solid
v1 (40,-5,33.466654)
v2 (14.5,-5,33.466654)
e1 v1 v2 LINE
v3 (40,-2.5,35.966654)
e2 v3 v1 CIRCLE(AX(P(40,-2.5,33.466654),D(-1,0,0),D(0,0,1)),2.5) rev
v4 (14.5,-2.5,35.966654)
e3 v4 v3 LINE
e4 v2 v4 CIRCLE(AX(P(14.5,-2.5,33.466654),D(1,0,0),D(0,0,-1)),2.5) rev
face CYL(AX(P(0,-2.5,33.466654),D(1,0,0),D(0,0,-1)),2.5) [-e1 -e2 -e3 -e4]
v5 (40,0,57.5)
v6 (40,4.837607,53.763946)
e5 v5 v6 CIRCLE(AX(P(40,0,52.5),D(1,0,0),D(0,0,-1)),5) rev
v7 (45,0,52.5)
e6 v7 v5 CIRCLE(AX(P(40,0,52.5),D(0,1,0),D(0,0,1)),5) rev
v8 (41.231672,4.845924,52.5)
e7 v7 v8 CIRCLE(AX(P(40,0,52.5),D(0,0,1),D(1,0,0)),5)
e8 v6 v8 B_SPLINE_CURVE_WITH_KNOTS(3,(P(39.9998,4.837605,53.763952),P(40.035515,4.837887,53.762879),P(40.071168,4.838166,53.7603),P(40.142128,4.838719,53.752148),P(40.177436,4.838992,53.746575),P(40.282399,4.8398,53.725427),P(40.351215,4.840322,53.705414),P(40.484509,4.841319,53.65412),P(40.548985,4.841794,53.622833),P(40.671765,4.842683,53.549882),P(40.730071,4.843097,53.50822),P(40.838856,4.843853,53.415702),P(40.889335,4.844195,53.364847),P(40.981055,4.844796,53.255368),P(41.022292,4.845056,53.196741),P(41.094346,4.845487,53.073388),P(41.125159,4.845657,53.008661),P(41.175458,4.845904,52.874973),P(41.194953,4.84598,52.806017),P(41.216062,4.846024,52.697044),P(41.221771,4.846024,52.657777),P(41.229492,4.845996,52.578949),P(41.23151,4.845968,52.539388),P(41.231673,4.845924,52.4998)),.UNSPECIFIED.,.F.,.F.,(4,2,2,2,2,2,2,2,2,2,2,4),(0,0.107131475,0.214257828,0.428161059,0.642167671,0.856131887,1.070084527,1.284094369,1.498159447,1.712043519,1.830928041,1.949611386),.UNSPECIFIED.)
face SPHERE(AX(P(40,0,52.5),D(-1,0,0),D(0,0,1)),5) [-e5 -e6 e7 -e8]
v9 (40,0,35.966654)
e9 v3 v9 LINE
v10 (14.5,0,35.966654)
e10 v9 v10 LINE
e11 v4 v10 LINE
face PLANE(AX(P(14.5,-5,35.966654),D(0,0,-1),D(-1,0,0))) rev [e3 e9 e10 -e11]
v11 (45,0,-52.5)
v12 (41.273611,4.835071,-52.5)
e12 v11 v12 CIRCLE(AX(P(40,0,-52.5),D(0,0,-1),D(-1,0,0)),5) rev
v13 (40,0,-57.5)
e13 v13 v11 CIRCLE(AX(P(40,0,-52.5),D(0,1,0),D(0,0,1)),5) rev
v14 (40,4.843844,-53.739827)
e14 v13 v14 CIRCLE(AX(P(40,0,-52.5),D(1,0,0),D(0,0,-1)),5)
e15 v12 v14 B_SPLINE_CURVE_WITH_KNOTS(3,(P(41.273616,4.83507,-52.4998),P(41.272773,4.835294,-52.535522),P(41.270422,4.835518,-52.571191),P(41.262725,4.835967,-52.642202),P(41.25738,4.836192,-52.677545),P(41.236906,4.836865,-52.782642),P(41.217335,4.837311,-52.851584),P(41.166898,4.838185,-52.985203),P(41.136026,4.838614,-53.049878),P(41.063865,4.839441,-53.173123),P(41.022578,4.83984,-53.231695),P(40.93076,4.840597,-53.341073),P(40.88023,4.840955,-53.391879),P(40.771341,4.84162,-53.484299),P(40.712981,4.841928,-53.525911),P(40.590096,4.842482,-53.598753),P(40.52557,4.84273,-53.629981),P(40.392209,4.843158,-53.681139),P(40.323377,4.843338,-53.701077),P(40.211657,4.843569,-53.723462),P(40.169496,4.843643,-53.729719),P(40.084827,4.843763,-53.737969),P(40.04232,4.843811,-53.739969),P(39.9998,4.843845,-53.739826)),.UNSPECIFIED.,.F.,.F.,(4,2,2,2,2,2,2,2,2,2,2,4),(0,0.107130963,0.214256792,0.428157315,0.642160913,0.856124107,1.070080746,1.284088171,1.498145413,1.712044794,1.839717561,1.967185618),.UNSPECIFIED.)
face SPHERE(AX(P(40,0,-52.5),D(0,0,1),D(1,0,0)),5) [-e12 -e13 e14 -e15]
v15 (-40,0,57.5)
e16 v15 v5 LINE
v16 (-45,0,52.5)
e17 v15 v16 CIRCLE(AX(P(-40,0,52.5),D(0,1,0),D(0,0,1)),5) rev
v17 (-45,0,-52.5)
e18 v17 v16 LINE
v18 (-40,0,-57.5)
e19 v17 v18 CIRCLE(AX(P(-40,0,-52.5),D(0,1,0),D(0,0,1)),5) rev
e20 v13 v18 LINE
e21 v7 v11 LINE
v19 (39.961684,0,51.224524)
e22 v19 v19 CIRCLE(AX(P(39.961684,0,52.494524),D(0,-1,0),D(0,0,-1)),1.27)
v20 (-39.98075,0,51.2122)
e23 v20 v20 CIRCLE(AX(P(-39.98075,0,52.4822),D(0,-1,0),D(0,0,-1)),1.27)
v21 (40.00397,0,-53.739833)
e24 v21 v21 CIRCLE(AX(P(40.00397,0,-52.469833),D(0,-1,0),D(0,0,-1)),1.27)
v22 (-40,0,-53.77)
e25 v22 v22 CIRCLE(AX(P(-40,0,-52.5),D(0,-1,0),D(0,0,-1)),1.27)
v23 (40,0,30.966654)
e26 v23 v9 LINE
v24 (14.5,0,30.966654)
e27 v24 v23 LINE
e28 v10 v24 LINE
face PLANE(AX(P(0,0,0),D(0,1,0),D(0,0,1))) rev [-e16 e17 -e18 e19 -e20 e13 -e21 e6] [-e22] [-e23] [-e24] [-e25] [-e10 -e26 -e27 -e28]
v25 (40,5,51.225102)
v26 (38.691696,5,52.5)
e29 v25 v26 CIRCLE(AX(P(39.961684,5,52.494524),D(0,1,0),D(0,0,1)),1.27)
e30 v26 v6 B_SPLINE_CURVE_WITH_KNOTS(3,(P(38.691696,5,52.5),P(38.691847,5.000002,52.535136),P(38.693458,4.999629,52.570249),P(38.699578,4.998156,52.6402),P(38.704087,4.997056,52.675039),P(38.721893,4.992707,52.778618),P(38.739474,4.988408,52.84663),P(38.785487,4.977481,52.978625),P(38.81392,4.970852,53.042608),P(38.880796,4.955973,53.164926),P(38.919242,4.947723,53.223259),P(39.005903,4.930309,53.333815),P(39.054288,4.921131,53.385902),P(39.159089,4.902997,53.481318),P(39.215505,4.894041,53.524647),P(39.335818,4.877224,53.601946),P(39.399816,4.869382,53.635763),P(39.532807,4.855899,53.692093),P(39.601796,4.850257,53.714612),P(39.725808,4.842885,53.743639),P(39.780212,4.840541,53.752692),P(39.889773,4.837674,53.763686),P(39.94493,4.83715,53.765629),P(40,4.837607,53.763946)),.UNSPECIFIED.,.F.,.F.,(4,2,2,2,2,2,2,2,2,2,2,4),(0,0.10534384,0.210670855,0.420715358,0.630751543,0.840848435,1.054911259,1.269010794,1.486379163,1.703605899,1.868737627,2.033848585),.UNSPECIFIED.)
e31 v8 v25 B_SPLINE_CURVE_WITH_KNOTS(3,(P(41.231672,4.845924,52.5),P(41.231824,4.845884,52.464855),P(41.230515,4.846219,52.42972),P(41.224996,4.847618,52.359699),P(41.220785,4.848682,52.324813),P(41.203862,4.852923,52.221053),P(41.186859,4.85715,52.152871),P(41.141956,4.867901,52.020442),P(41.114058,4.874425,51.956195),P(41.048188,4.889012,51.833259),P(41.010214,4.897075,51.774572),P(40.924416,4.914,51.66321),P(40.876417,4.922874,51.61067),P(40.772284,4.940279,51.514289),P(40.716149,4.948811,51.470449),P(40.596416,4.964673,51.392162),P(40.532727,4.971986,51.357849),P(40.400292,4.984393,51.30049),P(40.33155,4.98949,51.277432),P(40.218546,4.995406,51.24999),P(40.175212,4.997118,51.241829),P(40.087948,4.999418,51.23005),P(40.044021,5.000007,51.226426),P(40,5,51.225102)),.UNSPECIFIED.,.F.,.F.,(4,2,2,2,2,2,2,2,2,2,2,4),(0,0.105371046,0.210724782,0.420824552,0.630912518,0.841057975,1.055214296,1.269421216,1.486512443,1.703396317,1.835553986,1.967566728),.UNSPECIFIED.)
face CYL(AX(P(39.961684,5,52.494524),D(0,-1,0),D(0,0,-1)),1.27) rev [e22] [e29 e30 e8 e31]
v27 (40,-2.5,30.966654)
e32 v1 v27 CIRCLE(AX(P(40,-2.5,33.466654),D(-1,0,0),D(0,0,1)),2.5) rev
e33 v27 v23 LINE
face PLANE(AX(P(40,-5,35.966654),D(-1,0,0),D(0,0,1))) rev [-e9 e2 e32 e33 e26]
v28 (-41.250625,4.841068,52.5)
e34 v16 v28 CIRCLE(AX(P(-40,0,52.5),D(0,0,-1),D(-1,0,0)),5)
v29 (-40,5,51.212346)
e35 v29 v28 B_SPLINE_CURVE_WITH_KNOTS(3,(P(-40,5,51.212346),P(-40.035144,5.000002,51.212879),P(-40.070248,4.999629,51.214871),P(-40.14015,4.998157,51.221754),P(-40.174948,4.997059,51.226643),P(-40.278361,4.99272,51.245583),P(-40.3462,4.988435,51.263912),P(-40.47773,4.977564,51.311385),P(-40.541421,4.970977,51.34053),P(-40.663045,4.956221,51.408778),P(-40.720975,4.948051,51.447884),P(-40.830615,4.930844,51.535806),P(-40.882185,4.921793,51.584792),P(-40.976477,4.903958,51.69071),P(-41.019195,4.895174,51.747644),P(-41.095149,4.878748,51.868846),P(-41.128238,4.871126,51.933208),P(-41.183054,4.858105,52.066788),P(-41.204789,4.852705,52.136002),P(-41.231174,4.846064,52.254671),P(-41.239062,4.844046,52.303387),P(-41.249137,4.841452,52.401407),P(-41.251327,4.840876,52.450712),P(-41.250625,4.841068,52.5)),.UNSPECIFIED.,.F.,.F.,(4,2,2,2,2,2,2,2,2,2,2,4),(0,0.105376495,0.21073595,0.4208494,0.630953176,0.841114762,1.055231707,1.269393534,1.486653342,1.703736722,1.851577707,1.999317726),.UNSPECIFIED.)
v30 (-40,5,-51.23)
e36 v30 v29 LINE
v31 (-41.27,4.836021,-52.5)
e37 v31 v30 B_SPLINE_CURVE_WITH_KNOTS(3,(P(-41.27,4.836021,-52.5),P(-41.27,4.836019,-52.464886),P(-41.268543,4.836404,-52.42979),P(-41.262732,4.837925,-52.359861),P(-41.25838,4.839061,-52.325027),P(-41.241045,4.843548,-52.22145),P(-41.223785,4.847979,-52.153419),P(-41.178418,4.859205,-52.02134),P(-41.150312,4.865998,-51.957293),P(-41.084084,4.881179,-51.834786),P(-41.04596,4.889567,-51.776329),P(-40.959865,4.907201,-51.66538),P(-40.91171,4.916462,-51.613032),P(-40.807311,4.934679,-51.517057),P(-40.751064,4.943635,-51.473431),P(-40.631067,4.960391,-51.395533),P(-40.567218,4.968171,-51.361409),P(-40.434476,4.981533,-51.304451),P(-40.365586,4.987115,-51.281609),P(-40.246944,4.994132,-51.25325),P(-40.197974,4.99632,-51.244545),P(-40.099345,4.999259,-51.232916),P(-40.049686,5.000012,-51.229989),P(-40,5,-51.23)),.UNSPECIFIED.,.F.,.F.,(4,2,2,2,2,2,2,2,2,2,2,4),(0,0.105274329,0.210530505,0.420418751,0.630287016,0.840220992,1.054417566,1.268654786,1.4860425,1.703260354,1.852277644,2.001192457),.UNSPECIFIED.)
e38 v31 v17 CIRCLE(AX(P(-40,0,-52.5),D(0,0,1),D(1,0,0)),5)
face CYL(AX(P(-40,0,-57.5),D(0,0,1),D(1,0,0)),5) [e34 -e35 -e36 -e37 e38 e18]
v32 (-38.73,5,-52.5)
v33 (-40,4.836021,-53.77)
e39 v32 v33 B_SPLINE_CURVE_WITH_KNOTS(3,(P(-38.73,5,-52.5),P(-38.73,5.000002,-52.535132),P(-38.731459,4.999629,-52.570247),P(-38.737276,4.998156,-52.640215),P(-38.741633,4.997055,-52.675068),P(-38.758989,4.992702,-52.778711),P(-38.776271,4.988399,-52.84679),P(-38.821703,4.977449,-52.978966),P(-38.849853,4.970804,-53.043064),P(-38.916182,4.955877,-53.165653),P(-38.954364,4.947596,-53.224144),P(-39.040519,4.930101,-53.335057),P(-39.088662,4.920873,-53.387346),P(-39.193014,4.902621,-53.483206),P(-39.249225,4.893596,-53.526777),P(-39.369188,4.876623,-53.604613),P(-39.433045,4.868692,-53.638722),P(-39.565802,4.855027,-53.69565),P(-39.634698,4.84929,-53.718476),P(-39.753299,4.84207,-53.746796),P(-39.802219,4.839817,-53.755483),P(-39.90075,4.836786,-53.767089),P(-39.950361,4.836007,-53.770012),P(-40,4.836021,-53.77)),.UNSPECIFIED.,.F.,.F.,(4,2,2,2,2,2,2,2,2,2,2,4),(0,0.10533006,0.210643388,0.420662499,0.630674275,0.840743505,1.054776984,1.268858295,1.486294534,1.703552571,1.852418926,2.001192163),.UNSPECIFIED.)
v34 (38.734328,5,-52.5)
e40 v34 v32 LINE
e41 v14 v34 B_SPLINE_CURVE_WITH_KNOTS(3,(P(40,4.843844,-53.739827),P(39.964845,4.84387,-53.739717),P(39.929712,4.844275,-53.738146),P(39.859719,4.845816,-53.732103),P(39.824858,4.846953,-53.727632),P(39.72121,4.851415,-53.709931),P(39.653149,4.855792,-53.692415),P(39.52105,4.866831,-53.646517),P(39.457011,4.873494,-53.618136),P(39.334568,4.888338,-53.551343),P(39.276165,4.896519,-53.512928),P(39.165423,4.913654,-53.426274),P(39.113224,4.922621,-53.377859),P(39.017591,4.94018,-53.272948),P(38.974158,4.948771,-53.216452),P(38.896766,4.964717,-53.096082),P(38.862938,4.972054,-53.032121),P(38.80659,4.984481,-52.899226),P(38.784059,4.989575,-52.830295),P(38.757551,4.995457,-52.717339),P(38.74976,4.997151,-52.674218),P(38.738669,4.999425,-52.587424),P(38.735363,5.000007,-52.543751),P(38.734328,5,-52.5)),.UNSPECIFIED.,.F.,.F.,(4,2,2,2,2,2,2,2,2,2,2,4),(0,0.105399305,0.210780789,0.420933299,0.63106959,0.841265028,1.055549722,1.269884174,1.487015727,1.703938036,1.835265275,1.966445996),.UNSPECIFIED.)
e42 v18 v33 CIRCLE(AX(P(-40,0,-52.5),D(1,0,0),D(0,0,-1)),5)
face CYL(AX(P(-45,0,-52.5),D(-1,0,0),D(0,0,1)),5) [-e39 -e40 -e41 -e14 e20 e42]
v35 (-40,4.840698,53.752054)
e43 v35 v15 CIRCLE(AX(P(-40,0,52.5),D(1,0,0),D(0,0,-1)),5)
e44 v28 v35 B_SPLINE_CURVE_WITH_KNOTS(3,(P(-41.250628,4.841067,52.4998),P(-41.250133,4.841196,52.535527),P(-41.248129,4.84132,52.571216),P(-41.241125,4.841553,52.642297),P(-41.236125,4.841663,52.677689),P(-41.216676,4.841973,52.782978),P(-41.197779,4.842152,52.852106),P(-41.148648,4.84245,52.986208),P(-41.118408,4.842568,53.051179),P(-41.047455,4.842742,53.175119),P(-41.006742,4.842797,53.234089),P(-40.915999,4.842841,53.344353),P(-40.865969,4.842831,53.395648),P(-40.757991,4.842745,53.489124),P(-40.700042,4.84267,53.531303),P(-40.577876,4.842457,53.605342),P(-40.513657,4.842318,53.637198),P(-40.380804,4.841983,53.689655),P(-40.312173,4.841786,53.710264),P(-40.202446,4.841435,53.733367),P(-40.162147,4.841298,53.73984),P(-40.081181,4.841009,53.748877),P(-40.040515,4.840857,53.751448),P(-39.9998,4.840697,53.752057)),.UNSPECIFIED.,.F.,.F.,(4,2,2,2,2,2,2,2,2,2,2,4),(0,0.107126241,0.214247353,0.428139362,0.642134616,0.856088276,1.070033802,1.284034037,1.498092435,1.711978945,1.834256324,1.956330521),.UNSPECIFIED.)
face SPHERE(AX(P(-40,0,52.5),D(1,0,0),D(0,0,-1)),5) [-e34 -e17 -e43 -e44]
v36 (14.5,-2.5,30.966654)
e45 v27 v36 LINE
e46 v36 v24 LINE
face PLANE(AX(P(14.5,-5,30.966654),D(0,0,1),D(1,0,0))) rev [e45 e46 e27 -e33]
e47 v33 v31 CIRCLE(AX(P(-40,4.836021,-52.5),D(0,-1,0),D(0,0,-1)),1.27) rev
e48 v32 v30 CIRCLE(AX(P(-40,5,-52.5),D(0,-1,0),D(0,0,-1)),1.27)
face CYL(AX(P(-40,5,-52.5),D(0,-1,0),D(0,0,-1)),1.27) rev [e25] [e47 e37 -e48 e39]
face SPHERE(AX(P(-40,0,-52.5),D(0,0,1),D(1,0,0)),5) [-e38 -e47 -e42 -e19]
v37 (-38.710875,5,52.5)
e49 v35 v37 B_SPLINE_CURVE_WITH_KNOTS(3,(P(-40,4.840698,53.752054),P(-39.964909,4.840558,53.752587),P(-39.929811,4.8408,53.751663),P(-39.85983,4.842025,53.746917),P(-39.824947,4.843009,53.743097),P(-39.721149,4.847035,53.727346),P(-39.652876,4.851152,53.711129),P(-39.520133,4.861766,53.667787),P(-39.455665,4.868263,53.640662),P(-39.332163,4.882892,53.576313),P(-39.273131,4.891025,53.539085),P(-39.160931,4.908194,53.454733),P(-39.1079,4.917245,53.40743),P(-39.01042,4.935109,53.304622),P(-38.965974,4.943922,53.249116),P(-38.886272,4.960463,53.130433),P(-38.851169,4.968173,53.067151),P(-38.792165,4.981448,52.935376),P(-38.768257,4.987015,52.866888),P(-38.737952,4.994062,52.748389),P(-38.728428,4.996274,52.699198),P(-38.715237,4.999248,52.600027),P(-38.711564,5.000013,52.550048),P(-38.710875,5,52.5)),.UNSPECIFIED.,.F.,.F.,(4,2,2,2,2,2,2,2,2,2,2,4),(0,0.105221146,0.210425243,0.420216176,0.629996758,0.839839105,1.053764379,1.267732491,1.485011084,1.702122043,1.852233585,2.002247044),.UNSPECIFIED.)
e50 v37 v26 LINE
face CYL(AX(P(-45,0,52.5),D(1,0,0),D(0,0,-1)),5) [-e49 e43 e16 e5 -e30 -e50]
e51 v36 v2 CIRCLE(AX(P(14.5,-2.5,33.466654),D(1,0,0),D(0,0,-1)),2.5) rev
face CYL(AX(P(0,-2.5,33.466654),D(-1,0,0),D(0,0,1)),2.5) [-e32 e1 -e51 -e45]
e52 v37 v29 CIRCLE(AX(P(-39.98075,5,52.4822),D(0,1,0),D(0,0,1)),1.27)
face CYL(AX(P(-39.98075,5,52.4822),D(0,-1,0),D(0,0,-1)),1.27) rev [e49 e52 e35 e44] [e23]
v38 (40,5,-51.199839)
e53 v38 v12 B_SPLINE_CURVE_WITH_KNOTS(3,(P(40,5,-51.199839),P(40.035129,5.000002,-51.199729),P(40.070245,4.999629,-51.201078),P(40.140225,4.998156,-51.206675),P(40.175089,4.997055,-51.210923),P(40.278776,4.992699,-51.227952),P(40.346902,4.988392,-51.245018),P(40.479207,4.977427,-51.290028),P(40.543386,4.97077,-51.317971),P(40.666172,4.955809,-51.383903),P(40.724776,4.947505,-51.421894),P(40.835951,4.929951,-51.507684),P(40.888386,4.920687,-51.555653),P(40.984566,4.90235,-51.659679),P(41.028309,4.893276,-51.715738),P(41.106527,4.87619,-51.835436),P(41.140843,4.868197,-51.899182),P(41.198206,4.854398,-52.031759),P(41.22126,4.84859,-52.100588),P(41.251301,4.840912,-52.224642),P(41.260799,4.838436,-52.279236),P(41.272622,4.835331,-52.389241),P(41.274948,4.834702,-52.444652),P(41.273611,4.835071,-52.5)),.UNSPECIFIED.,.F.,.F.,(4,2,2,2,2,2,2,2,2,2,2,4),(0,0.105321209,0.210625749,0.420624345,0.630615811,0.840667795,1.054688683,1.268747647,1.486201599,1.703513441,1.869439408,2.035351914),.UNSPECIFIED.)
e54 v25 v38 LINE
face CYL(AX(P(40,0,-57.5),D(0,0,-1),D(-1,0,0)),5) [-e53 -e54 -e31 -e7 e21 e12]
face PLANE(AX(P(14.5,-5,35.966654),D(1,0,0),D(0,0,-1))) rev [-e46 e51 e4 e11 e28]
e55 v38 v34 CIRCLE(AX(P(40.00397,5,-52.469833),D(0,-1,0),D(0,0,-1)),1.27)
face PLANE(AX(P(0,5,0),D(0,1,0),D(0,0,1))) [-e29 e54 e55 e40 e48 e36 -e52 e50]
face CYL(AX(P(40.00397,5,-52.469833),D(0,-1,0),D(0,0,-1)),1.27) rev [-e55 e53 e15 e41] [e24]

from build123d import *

# Parameters (mm, degrees)
SKETCH1_W           = 90
SKETCH1_H           = 115
BOSS_EXTRUDE1_DEPTH = 5
FILLET4_R           = 5
FILLET5_R           = 5
FILLET6_R           = 5
FILLET7_R           = 5
SKETCH4_W           = 25.5
SKETCH4_H           = 5
BOSS_EXTRUDE2_DEPTH = 5
FILLET12_R          = 2.5
FILLET13_R          = 2.5
SKETCH7_R           = 1.27
CUT_EXTRUDE2_DEPTH  = 74.186405842


with BuildPart() as part:
    # Sketch1 → Boss-Extrude1 (new body)
    with BuildSketch(Plane(origin=(0, 0, 0), x_dir=(1, 0, 0), z_dir=(0, 1, 0))):
        Rectangle(SKETCH1_W, SKETCH1_H)
    extrude(amount=BOSS_EXTRUDE1_DEPTH)

    # Fillet4
    fillet4_edges = [part.edges().sort_by_distance(p)[0] for p in [
        (0, 5, 57.5),
    ]]
    fillet(fillet4_edges, radius=FILLET4_R - 0.0001)  # a hair under: the kernel refuses the full size

    # Fillet5
    fillet5_edges = [part.edges().sort_by_distance(p)[0] for p in [
        (-45, 5, -2.49995),
        (-45, 3.535563195, 56.035563195),
    ]]
    fillet(fillet5_edges, radius=FILLET5_R - 0.0001)  # a hair under: the kernel refuses the full size

    # Fillet6
    fillet6_edges = [part.edges().sort_by_distance(p)[0] for p in [
        (45, 5, -2.49995),
        (45, 3.535563195, 56.035563195),
    ]]
    fillet(fillet6_edges, radius=FILLET6_R - 0.0001)  # a hair under: the kernel refuses the full size

    # Fillet7
    fillet7_edges = [part.edges().sort_by_distance(p)[0] for p in [
        (-43.535563195, 3.535563195, -57.5),
        (0, 5, -57.5),
        (43.535563195, 3.535563195, -57.5),
    ]]
    fillet(fillet7_edges, radius=FILLET7_R - 0.0001)  # a hair under: the kernel refuses the full size

    # Sketch4 → Boss-Extrude2 (add)
    with BuildSketch(Plane.XZ):
        with Locations((27.25, 33.466653617)):
            Rectangle(SKETCH4_W, SKETCH4_H)
    extrude(amount=BOSS_EXTRUDE2_DEPTH)

    # Fillet12
    fillet12_edges = [part.edges().sort_by_distance(p)[0] for p in [
        (27.25, -5, 35.966653617),
    ]]
    fillet(fillet12_edges, radius=FILLET12_R)

    # Fillet13
    fillet13_edges = [part.edges().sort_by_distance(p)[0] for p in [
        (27.25, -5, 30.966653617),
    ]]
    fillet(fillet13_edges, radius=FILLET13_R - 0.0001)  # a hair under: the kernel refuses the full size

    # Sketch7 → Cut-Extrude2 (cut, through all)
    with BuildSketch(Plane.XZ):
        with Locations(Location((-40, -52.5, 0), (0, 0, 270))):
            Circle(SKETCH7_R)
        with Locations(Location((40.003969698, -52.469833039, 0), (0, 0, 270))):
            Circle(SKETCH7_R)
        with Locations(Location((39.961684065, 52.494524109, 0), (0, 0, 270))):
            Circle(SKETCH7_R)
        with Locations(Location((-39.980749964, 52.482200306, 0), (0, 0, 270))):
            Circle(SKETCH7_R)
    extrude(amount=-CUT_EXTRUDE2_DEPTH, mode=Mode.SUBTRACT)


solid = part.part
